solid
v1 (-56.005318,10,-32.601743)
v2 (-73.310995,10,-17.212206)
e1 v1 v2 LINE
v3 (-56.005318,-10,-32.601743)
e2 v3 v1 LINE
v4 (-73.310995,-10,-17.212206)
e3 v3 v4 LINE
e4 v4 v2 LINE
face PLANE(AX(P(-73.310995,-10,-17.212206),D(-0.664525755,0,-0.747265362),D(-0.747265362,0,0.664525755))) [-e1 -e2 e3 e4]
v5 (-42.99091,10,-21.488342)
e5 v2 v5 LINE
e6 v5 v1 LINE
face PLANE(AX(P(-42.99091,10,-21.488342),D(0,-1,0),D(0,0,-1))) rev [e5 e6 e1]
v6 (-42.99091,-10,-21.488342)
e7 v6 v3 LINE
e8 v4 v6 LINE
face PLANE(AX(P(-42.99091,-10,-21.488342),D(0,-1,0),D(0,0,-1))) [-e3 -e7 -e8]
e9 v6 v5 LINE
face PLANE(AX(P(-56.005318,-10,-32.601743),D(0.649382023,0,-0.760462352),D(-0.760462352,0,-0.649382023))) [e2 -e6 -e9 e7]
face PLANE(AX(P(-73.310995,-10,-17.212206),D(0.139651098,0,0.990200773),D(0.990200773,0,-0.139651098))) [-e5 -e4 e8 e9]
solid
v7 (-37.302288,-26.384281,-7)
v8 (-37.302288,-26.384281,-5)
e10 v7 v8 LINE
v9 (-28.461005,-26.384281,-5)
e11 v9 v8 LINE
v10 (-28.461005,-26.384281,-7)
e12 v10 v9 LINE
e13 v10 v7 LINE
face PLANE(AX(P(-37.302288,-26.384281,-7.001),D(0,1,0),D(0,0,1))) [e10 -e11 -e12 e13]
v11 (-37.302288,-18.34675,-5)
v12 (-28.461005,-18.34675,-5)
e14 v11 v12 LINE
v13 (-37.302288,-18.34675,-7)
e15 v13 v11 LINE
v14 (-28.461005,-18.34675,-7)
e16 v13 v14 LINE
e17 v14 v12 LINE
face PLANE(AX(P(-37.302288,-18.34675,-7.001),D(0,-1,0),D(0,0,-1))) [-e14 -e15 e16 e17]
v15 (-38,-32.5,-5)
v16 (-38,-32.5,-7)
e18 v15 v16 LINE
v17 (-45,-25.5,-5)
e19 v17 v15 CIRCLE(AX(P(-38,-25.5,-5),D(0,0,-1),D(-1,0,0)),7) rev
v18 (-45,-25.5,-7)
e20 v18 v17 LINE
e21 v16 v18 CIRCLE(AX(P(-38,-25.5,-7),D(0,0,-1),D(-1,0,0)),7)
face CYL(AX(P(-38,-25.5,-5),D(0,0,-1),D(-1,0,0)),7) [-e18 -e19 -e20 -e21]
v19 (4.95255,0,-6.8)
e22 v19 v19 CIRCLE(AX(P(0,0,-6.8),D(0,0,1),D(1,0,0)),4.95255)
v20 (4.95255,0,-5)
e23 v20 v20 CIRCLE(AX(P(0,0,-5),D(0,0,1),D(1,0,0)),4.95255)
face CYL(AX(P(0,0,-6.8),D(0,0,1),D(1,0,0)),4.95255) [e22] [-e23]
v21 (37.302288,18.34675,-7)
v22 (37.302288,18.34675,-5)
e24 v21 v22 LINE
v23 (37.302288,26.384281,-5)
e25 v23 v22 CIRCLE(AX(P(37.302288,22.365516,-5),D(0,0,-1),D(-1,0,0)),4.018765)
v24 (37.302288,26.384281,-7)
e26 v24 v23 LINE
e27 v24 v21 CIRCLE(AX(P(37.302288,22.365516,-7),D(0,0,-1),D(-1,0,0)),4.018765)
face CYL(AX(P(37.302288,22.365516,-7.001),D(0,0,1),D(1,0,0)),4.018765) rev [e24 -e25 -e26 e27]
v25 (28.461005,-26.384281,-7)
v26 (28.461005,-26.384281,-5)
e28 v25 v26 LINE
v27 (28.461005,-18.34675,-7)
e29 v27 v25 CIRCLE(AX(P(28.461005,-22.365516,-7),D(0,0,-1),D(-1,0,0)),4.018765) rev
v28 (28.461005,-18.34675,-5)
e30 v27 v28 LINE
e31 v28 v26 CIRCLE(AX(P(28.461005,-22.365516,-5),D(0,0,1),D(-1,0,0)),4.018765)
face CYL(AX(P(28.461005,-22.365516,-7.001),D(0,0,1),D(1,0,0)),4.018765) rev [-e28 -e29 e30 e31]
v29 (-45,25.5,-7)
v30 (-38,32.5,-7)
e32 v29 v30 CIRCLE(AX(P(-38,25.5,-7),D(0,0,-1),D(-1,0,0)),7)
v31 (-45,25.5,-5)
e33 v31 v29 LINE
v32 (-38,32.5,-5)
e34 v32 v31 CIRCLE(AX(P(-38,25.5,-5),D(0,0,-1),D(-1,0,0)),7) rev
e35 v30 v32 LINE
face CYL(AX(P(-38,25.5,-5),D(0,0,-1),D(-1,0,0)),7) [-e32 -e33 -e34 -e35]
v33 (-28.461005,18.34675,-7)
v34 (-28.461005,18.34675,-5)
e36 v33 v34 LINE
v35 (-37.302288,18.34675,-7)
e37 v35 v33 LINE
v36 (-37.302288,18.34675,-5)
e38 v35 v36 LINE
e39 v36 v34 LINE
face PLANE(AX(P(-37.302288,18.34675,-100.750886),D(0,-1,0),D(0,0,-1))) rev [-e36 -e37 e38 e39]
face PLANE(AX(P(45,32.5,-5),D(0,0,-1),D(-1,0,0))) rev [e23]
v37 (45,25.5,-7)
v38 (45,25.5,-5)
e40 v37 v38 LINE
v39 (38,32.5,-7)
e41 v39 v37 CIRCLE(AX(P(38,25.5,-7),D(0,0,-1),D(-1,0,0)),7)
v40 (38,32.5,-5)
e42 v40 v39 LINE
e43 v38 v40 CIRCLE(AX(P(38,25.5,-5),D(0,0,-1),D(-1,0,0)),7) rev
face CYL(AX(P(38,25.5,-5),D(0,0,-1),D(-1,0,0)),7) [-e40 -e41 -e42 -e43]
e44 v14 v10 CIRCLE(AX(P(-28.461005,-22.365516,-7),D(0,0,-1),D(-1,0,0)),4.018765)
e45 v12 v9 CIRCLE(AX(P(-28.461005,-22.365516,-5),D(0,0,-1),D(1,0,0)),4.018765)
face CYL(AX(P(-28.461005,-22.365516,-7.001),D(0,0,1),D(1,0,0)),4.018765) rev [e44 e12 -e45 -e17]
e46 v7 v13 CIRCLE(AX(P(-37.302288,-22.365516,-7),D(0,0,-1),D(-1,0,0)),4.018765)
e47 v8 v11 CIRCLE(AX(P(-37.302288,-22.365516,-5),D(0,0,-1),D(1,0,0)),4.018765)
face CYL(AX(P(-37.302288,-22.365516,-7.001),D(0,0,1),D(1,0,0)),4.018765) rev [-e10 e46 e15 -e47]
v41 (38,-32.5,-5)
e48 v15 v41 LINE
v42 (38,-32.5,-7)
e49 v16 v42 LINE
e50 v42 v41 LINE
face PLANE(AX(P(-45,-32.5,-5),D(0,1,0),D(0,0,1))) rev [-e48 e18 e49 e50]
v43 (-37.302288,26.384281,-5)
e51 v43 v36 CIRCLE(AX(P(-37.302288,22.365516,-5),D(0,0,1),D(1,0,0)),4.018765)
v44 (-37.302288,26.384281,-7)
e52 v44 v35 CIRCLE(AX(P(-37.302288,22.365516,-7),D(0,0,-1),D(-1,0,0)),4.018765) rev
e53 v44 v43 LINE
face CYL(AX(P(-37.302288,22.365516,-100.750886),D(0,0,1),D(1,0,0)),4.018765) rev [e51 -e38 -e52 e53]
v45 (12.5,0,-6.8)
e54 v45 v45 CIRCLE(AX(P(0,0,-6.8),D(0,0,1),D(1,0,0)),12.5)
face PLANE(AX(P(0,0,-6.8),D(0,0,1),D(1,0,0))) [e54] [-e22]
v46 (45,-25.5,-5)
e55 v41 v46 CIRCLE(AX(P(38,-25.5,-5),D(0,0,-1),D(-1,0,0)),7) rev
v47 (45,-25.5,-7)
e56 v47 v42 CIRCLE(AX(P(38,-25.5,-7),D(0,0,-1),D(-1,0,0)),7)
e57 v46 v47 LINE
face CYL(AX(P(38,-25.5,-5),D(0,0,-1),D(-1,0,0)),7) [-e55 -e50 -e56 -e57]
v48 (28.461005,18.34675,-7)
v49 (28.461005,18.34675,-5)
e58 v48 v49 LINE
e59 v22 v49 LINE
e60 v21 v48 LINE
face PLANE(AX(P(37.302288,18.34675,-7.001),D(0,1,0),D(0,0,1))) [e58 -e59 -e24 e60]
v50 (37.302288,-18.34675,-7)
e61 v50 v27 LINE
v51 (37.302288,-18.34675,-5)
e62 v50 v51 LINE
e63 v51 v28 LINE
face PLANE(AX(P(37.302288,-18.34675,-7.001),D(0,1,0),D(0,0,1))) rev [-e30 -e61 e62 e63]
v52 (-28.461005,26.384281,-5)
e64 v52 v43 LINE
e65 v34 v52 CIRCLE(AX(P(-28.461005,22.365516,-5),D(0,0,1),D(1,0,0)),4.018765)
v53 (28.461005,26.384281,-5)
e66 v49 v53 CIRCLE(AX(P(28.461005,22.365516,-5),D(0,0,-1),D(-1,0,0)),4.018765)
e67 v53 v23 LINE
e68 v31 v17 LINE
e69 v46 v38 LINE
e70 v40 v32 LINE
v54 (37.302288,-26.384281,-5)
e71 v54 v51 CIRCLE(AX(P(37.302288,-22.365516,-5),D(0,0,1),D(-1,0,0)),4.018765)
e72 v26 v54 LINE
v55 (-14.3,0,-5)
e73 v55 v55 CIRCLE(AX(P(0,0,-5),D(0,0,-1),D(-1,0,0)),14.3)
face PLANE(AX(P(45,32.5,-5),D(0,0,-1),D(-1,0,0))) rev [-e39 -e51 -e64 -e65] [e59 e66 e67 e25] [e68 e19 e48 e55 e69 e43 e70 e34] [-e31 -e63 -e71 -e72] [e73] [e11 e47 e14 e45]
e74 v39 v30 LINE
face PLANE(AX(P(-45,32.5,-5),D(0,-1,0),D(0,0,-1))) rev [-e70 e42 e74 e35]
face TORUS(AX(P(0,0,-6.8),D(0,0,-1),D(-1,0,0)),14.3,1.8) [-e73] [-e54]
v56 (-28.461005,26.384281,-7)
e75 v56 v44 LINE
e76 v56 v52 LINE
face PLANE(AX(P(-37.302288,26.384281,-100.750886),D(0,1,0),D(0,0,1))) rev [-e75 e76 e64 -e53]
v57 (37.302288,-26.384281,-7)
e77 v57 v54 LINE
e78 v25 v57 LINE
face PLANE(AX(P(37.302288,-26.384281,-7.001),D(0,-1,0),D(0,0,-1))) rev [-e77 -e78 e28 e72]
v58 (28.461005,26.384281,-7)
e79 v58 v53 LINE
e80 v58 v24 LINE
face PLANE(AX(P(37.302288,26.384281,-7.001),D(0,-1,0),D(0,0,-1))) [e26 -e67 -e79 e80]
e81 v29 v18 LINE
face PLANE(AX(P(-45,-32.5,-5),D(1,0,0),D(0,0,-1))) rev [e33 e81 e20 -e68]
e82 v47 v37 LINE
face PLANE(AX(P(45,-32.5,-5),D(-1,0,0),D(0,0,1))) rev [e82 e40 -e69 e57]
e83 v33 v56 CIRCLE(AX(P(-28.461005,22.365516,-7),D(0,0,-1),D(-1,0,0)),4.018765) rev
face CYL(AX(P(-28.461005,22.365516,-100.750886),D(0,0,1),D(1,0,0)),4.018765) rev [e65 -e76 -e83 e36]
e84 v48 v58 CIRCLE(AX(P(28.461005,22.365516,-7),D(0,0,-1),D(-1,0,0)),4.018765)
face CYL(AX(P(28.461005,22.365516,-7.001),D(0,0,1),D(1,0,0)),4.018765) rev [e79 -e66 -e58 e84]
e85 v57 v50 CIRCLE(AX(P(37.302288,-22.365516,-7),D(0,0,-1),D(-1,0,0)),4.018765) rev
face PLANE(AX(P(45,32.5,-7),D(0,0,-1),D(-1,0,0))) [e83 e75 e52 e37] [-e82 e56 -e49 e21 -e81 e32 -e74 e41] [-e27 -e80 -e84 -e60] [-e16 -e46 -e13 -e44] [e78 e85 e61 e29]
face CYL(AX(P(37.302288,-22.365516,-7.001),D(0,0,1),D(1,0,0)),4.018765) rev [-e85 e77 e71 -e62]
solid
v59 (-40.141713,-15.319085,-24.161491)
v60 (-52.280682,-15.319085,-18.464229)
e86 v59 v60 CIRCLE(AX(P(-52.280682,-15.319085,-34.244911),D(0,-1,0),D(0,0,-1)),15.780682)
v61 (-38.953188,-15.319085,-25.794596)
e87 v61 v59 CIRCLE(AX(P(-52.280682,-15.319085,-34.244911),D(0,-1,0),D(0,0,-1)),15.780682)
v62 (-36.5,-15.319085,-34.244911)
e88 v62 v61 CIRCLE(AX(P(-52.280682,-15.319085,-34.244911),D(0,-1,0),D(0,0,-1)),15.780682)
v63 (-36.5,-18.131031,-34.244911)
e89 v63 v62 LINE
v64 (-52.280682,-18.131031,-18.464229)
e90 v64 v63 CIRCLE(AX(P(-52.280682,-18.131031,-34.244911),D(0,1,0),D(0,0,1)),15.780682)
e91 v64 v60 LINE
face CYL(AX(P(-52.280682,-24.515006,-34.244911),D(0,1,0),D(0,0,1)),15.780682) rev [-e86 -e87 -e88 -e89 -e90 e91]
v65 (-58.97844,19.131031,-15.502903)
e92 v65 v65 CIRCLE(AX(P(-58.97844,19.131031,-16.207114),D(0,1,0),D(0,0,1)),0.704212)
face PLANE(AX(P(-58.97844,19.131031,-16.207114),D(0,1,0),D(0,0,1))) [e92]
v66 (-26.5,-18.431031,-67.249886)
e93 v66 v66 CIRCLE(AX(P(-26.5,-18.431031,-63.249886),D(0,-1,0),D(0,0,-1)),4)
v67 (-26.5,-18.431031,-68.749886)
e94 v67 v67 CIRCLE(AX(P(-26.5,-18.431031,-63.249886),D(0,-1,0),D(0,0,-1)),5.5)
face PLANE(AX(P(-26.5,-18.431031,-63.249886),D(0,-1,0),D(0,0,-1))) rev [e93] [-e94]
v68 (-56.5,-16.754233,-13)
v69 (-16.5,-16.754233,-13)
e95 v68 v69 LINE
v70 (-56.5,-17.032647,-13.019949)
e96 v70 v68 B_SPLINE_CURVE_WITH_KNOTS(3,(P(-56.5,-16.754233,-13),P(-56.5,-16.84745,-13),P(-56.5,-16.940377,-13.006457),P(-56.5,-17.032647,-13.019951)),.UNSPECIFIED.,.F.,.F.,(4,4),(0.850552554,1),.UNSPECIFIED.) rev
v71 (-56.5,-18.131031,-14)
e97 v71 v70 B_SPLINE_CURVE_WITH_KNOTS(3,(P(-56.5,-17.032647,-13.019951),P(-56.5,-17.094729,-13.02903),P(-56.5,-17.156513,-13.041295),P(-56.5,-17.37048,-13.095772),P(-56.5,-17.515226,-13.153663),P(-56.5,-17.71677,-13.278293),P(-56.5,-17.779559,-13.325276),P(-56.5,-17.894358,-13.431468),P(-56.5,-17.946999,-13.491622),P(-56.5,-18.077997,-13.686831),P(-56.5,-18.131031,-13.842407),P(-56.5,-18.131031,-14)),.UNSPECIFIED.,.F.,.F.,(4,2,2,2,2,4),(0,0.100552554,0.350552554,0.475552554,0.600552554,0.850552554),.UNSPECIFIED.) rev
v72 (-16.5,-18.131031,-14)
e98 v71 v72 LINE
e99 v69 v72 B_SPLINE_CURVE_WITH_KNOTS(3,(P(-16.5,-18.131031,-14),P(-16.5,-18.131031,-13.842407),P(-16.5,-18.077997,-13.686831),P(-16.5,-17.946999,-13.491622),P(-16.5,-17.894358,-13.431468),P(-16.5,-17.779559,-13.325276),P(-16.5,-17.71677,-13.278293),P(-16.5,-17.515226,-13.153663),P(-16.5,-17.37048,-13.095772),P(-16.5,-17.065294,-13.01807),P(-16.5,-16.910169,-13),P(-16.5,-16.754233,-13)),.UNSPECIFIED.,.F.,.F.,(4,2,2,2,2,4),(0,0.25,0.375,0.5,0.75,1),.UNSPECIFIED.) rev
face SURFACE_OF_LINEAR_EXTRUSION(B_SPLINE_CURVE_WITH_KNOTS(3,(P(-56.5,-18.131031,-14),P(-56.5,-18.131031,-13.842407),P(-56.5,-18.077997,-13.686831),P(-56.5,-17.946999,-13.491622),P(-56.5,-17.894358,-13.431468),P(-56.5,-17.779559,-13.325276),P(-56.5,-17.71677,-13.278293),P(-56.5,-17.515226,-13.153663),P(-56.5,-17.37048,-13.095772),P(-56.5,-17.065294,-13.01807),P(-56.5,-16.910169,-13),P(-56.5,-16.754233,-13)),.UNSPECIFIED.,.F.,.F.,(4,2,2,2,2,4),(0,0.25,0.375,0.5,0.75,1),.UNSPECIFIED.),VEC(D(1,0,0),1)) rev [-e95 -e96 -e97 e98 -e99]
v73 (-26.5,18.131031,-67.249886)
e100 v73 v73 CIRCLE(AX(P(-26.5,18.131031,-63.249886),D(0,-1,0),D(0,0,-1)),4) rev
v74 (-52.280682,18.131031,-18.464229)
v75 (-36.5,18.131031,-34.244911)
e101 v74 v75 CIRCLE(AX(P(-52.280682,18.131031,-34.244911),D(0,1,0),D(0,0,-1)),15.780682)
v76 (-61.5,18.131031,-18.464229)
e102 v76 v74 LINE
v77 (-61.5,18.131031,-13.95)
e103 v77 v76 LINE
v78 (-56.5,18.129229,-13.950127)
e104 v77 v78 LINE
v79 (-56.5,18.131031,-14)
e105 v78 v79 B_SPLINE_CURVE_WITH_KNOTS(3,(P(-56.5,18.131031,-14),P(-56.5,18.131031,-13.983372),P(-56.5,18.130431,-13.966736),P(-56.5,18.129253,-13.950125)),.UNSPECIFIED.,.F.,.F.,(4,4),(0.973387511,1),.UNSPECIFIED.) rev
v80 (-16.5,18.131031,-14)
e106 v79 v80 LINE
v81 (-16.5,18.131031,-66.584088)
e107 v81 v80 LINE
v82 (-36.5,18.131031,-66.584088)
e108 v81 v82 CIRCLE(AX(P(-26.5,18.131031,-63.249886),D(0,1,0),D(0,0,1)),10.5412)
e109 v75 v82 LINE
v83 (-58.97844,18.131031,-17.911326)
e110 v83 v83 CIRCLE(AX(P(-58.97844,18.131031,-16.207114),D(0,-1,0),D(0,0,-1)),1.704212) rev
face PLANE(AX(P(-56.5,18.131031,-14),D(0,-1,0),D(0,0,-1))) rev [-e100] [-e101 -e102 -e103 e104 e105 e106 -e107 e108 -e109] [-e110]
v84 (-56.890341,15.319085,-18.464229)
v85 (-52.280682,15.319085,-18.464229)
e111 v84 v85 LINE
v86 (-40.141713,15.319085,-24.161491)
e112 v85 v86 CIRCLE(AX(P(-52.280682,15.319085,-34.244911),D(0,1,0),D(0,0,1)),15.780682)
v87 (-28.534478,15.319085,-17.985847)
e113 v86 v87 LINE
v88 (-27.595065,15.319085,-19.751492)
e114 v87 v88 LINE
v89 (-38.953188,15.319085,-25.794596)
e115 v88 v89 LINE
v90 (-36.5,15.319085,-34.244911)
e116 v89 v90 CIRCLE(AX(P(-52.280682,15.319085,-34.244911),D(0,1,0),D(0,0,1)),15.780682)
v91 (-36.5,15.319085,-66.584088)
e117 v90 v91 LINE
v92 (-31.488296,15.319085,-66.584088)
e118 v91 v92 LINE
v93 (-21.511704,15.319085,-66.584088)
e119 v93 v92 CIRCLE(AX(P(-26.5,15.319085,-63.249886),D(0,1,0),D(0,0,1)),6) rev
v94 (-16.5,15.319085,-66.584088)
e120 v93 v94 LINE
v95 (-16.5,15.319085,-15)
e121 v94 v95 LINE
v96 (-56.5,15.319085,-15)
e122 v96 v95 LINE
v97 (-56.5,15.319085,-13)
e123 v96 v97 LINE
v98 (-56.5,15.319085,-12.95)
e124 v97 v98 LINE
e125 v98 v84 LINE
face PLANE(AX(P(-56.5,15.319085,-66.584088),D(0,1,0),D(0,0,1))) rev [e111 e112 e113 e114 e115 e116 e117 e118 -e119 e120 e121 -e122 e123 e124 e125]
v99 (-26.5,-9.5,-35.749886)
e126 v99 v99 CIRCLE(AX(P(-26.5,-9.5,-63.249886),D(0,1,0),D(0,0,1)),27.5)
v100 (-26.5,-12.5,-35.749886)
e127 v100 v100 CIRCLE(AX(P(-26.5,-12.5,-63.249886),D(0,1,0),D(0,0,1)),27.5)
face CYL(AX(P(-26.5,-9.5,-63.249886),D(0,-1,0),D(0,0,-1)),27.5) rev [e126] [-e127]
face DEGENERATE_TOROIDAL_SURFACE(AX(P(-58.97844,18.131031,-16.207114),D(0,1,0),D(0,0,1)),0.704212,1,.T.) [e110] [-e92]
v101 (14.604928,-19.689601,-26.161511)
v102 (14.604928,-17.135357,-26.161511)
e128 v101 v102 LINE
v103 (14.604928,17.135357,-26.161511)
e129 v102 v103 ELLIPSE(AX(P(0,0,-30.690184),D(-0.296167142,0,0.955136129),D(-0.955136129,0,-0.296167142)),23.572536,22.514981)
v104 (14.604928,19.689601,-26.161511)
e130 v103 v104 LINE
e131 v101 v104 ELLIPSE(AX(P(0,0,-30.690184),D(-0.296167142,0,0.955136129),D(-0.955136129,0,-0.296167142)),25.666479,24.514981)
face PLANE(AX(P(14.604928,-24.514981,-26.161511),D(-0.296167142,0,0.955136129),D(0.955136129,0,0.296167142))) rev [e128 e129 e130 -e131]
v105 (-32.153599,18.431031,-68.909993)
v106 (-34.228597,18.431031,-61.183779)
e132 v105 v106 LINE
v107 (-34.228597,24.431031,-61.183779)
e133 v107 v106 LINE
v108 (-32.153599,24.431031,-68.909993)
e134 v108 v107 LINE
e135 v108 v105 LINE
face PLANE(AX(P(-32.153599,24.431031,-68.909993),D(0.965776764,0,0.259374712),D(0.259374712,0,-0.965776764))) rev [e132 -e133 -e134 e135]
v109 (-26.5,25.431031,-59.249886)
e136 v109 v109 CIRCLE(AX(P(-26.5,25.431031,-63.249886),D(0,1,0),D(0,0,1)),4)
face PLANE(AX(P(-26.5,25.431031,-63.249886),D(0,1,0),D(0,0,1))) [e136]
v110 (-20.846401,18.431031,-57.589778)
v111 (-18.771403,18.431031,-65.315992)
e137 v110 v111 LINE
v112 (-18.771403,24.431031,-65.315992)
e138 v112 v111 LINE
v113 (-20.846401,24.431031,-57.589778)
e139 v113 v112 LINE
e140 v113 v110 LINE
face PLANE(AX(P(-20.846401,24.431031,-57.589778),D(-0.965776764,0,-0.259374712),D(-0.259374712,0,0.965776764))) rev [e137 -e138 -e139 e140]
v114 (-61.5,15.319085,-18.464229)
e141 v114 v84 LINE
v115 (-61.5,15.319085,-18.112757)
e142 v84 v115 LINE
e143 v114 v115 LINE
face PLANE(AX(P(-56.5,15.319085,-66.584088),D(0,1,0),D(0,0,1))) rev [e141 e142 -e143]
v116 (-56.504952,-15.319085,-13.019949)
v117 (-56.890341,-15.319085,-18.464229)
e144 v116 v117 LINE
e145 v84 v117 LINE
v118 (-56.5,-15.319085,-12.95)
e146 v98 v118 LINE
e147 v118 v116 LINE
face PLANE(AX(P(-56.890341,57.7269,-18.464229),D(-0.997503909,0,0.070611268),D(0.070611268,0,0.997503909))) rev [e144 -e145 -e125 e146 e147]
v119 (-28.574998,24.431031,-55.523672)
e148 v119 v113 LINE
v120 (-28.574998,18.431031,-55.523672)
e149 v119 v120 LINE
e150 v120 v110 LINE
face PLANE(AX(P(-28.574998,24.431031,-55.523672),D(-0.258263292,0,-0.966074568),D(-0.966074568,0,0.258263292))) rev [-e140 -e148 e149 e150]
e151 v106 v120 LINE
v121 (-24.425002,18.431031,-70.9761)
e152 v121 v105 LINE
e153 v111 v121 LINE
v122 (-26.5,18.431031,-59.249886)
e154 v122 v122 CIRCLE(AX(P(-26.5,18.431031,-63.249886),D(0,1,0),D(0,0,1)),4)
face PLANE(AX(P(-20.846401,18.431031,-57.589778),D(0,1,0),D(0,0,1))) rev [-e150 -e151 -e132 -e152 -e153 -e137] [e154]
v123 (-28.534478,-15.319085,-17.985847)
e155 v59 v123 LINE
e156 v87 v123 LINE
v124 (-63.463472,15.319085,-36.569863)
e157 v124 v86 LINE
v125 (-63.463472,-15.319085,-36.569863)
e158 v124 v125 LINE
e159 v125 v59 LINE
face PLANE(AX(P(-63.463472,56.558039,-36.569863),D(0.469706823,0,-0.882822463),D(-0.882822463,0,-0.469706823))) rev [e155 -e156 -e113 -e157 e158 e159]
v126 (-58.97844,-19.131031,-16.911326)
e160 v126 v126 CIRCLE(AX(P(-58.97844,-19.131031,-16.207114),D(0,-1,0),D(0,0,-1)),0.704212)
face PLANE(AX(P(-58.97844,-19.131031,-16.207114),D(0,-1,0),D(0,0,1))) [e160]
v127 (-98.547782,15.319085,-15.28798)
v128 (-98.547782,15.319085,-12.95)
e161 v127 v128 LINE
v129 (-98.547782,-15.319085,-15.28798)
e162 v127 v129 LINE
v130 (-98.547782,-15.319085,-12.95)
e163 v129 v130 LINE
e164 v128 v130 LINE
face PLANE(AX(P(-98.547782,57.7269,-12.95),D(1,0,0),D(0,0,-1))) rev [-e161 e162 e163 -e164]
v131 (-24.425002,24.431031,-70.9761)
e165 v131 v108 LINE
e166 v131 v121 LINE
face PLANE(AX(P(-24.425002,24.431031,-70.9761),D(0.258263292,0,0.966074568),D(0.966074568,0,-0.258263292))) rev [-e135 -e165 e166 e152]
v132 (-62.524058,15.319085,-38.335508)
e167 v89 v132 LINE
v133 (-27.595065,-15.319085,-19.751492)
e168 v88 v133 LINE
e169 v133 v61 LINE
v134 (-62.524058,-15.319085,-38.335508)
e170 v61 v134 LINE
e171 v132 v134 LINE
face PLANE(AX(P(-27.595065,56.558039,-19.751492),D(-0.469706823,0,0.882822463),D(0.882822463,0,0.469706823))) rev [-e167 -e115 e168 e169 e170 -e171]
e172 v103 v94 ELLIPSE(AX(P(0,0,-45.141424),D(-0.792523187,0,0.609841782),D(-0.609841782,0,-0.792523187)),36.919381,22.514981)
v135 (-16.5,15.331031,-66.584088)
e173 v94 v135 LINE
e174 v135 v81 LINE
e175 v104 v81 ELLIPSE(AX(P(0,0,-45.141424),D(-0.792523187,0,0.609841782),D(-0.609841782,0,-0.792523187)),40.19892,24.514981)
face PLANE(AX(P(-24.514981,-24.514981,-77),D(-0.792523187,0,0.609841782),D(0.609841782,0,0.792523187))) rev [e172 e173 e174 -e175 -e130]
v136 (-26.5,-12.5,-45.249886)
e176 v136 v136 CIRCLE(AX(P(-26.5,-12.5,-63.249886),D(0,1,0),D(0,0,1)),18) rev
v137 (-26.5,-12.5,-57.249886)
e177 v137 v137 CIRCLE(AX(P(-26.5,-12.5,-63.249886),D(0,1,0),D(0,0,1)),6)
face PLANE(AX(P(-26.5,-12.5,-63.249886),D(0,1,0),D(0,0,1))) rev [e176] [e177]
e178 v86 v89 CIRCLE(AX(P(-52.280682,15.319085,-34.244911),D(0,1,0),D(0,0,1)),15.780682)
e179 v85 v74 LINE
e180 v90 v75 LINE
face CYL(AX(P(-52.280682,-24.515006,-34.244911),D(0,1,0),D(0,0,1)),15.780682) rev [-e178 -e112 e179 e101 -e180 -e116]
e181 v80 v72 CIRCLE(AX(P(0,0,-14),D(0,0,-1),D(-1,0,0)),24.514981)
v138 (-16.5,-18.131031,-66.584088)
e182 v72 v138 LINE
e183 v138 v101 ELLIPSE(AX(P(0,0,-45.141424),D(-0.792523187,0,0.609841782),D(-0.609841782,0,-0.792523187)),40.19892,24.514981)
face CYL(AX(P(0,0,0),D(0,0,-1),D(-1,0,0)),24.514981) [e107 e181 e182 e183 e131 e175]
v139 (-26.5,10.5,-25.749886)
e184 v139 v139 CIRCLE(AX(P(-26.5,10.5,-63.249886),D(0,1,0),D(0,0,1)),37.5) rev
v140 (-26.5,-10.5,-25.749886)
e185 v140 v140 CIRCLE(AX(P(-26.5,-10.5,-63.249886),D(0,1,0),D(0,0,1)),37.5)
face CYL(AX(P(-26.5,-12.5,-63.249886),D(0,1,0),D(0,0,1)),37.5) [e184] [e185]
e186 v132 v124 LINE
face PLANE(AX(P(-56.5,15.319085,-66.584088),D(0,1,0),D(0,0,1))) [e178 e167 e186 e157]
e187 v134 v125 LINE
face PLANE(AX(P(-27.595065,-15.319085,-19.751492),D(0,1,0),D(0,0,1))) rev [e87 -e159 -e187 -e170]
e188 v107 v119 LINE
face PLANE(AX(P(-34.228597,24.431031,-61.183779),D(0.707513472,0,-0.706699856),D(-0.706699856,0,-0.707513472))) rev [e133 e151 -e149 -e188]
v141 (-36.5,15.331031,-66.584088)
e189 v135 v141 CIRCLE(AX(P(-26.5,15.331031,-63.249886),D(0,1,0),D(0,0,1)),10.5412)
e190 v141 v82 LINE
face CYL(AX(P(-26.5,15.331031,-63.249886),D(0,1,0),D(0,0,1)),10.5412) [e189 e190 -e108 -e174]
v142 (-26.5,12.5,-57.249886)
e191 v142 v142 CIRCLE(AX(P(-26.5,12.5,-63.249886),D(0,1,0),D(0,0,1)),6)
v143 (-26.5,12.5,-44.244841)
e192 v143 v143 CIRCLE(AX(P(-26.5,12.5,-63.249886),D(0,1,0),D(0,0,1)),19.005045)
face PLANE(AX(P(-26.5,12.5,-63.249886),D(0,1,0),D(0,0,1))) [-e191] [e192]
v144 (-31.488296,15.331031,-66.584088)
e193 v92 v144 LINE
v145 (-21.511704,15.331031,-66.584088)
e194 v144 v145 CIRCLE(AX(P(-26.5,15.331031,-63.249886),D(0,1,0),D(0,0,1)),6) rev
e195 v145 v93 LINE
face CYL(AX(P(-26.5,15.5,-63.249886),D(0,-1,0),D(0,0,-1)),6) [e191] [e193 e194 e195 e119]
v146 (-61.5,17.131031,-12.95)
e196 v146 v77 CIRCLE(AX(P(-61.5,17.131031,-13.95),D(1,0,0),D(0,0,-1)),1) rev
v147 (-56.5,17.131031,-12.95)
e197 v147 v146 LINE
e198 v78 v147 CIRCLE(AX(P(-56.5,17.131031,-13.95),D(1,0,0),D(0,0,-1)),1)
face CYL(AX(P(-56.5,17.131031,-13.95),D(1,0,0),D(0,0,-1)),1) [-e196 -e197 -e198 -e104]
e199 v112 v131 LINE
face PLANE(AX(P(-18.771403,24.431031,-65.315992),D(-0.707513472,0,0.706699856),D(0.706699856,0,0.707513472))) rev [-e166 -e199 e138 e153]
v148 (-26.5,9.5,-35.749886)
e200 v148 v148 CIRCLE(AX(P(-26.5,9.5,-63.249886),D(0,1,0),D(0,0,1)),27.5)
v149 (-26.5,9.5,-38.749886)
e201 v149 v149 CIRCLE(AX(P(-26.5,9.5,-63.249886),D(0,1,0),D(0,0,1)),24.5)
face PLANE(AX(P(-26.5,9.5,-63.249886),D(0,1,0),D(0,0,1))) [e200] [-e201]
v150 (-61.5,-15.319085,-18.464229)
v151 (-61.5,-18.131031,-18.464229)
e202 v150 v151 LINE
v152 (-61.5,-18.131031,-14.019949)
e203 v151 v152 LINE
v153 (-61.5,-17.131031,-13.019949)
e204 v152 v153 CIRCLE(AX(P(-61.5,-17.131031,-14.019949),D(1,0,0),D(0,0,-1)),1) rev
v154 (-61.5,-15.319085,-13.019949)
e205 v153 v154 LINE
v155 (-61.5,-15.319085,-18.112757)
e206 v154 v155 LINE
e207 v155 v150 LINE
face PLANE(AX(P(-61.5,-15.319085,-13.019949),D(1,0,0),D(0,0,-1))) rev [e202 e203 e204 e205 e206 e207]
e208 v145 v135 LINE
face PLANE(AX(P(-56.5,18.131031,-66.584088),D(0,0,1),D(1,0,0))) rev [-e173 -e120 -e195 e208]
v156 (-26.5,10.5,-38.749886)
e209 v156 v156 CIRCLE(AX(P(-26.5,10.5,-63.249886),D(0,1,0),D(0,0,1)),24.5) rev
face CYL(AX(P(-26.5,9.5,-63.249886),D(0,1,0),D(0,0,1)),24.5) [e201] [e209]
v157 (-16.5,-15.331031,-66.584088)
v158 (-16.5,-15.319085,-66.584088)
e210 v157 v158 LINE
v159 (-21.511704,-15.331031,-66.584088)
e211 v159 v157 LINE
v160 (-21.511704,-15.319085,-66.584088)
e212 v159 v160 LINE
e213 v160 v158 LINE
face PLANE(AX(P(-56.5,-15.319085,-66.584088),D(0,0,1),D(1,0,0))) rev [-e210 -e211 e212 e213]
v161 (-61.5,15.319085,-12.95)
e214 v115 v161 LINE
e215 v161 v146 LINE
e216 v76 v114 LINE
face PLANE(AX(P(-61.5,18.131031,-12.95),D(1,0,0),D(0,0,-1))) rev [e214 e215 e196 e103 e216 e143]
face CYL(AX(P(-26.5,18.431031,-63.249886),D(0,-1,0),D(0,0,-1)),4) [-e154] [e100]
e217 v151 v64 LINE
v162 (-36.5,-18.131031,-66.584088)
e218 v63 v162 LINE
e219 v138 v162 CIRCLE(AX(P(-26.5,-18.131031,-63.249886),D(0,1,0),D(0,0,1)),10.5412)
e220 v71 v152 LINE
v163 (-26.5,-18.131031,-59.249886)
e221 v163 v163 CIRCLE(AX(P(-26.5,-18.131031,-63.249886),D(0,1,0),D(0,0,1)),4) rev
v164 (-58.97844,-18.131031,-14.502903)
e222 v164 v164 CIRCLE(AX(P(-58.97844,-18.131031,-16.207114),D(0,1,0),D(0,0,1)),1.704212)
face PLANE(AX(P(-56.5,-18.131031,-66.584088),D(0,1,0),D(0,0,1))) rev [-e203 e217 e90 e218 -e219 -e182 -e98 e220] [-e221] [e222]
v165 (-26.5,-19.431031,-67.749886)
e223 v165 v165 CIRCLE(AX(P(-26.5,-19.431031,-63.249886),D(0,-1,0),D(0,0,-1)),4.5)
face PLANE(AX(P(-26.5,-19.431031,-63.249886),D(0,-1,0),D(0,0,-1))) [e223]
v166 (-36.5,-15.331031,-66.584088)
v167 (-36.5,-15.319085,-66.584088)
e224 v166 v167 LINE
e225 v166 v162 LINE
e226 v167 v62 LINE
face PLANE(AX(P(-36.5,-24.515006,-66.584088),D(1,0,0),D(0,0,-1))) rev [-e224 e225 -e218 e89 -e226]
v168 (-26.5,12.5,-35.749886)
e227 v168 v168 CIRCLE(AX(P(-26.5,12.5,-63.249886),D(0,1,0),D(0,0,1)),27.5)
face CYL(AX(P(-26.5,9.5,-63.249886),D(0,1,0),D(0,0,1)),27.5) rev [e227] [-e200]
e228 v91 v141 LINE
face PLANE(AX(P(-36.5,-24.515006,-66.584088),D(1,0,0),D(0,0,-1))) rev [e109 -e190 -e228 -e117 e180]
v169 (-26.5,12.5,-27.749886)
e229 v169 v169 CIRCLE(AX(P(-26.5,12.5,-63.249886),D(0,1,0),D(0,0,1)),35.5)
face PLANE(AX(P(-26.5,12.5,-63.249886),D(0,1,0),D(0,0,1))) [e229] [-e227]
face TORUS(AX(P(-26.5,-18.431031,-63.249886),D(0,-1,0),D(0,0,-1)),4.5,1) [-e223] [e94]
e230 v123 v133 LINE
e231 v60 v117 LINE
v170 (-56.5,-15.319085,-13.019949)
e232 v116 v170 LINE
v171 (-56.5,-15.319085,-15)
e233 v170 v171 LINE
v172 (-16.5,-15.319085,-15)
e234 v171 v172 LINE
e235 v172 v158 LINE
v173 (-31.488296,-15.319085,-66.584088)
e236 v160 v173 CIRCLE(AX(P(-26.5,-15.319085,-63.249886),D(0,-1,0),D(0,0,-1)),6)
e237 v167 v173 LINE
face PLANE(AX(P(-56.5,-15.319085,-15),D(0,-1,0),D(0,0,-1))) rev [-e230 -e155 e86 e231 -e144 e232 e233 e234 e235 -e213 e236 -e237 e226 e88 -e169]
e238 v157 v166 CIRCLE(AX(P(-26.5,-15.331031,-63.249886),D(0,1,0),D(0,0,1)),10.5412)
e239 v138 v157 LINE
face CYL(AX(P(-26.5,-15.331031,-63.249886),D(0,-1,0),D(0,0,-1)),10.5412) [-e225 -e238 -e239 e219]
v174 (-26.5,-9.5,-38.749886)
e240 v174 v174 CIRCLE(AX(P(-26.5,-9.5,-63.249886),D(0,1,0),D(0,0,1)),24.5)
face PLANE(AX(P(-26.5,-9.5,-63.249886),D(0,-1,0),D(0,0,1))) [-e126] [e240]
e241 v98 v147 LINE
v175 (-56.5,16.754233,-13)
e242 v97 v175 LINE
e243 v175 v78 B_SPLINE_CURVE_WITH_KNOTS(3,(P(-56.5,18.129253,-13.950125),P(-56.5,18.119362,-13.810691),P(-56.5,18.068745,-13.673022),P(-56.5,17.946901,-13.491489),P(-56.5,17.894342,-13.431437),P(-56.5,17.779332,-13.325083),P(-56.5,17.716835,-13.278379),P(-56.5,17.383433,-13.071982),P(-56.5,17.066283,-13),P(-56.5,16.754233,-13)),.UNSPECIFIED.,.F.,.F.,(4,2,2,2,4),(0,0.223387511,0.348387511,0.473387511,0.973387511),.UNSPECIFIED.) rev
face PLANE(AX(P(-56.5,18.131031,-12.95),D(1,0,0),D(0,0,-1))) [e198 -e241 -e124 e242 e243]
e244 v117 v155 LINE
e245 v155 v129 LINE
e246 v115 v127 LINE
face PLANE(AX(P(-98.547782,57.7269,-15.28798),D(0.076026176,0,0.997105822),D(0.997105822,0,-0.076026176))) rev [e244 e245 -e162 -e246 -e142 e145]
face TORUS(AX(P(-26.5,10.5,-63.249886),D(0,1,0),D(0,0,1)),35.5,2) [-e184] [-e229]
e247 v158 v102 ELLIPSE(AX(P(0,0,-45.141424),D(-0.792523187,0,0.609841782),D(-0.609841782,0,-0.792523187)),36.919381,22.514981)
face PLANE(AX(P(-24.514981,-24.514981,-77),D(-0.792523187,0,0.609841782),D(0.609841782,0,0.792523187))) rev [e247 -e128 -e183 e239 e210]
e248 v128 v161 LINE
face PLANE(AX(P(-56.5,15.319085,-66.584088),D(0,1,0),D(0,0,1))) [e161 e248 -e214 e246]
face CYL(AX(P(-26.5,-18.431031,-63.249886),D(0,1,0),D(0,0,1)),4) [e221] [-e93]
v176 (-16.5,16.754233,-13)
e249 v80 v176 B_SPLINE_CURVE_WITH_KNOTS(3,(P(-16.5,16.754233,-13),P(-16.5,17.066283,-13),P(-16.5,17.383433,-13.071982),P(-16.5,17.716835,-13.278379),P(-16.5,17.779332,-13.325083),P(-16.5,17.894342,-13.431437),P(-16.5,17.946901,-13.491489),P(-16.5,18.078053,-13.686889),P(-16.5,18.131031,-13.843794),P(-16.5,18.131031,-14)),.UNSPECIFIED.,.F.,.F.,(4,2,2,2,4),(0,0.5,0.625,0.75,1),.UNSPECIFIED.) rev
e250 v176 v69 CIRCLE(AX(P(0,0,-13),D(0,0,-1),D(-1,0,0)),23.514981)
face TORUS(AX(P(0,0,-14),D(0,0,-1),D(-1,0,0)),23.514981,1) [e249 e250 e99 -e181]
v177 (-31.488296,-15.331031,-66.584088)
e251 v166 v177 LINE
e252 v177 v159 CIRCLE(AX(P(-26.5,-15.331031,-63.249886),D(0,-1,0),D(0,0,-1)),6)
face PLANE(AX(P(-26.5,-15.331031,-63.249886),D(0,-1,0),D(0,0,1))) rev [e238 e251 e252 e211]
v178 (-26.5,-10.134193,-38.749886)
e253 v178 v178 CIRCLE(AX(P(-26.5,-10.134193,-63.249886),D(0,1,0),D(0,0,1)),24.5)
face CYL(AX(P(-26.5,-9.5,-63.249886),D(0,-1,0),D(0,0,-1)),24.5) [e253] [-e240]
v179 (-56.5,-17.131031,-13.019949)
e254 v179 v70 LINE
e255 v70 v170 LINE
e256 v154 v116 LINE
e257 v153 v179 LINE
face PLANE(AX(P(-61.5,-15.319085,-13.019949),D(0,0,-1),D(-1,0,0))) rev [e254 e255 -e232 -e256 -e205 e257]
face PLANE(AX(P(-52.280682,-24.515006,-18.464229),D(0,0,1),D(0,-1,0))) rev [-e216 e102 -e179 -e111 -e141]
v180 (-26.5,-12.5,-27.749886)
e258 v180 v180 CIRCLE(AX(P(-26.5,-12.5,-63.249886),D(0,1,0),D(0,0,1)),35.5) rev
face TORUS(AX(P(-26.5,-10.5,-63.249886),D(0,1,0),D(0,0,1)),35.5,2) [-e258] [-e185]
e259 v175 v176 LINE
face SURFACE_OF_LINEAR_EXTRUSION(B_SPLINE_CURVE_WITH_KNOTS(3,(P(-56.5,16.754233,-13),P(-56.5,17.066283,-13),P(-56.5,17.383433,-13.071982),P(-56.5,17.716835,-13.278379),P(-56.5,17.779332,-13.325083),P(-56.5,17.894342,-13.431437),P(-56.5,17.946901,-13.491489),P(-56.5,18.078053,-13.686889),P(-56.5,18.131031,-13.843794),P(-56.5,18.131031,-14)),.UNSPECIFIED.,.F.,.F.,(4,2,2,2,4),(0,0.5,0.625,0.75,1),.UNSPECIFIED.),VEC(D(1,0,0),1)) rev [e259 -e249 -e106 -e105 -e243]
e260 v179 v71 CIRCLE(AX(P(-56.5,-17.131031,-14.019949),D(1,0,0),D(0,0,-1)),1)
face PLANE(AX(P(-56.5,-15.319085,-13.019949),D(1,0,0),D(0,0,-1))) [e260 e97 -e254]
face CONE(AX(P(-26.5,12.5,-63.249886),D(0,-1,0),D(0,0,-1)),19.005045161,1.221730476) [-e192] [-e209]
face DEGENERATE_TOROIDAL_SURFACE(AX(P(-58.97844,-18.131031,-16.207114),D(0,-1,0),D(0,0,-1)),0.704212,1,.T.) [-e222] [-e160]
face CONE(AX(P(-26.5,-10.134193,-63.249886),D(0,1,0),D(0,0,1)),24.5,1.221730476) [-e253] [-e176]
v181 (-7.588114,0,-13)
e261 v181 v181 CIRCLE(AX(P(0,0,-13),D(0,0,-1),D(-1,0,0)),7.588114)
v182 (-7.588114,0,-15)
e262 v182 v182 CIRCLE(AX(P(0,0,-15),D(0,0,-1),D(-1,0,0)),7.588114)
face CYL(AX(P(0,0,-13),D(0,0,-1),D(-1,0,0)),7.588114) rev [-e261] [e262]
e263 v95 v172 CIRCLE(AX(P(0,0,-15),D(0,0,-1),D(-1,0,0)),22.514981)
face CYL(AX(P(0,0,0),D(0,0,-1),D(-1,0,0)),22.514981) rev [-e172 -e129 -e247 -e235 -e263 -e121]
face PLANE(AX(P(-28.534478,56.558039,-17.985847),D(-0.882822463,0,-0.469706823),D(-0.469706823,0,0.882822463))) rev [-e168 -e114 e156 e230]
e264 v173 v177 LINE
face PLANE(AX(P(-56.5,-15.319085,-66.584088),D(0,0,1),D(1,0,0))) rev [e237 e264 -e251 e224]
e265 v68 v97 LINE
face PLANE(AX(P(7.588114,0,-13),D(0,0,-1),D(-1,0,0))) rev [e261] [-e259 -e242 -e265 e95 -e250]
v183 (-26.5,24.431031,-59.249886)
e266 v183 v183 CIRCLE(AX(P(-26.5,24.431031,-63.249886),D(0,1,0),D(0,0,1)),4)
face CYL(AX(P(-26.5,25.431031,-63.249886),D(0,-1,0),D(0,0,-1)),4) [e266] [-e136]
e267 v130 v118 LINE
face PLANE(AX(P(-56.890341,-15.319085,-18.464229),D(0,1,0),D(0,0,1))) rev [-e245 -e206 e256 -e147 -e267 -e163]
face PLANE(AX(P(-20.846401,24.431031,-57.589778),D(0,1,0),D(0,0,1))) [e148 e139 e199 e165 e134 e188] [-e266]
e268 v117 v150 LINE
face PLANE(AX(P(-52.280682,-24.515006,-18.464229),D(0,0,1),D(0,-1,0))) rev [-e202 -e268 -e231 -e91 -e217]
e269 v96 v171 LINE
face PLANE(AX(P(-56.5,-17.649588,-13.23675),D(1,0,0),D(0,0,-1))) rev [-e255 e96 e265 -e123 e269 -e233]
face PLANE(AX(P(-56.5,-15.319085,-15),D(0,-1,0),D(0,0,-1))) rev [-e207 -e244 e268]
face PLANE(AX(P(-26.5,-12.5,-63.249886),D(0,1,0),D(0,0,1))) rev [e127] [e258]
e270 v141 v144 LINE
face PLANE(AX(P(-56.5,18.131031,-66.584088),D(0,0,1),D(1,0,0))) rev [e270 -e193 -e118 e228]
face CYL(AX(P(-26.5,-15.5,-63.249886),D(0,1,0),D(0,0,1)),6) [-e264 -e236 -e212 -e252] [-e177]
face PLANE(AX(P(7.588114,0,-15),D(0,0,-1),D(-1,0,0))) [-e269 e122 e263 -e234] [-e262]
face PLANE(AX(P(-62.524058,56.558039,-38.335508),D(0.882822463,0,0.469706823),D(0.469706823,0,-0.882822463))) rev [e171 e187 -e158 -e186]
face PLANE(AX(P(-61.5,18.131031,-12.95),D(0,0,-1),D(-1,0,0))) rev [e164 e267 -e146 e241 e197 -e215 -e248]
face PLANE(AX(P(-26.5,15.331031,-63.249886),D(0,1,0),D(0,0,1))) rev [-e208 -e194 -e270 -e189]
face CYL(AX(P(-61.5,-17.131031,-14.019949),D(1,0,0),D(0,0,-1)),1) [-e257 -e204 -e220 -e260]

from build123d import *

# Parameters (mm, degrees)
CUT_EXTRUDE_2_DEPTH      = 85.445062578
CUT_EXTRUDE_2_DEPTH_BACK = 85.445062578
CUT_EXTRUDE_3_DEPTH      = 85.445062578
CUT_EXTRUDE_3_DEPTH_BACK = 85.445062578
EXTRUDE_6_DEPTH          = 40
EXTRUDE_7_DEPTH          = 2.8
CUT_EXTRUDE_4_DEPTH      = 103.254861861
SKETCH_18_R              = 4
EXTRUDE_8_DEPTH          = 0.3
EXTRUDE_9_DEPTH          = 6
SKETCH_20_R              = 4
EXTRUDE_10_DEPTH         = 1
EXTRUDE_START            = 0.3
SKETCH_21_R              = 4
EXTRUDE_11_DEPTH         = 0.3
SKETCH_22_R              = 5.5
EXTRUDE_12_DEPTH         = 1
FILLET_1_R               = 1
EXTRUDE_13_DEPTH         = 12.5
EXTRUDE_13_DEPTH_BACK    = 12.5
SKETCH_23_R              = 37.5
FILLET_2_R               = 2
SKETCH_24_R              = 27.5
SKETCH_24_R_2            = 24.5
CUT_EXTRUDE_5_DEPTH      = 3
CHAMFER_1_SIZE           = 2
CHAMFER_1_SIZE2          = 5.494954839
CHAMFER_2_SIZE           = 6.5
CHAMFER_2_SIZE2          = 2.365806523
SKETCH_25_R              = 6
EXTRUDE_14_DEPTH         = 3
SKETCH_28_W              = 5.514229373
SKETCH_28_H              = 2.811946084
SKETCH_28_W_2            = 5.444280039
EXTRUDE_15_DEPTH         = 5
FILLET_3_R               = 1
EXTRUDE_16_DEPTH         = 30.638170479
SKETCH_30_R              = 1.704211516
EXTRUDE_17_DEPTH         = 1
FILLET_4_R               = 1
FILLET_4_OF_MIRROR_7_R   = 1
EXTRUDE_18_DEPTH         = 30.638170479
EXTRUDE_21_DEPTH         = 10
EXTRUDE_21_DEPTH_BACK    = 10
SKETCH_33_W              = 90
SKETCH_33_H              = 65
EXTRUDE_22_DEPTH         = 2
FILLET_5_R               = 7
CUT_EXTRUDE_6_DEPTH      = 2
MIRROR_9_COPY_1_DEPTH    = 2
SKETCH_35_R              = 12.5
SKETCH_35_R_2            = 4.952549827
CUT_EXTRUDE_8_DEPTH      = 1.8
FILLET_6_R               = 1.8


# Read off the part's stored shape, not the designer's step: 加厚3
# Some blends are built 0.0001 mm under size
with BuildPart() as part:
    # 加厚3 outline → 加厚3 (revolve)
    with BuildSketch(Plane.XZ):
        with BuildLine():
            Line((22.51498107, -15), (22.51498107, -77))
            Line((22.51498107, -77), (24.51498107, -77))
            Line((24.51498107, -77), (24.51498107, -14))
            ThreePointArc((24.51498107, -14), (24.222087851, -13.292893219), (23.51498107, -13))
            Line((23.51498107, -13), (7.588114325, -13))
            Line((7.588114325, -13), (7.588114325, -15))
            Line((7.588114325, -15), (22.51498107, -15))
        make_face()
    revolve(axis=Axis((0, 0, 0), (0, 0, 1)))

    # 草图13 → 切除-拉伸2 (cut, two sides: drawn at the far end of the back side and taken through both)
    with BuildSketch(Plane(origin=(0, 0, 0), x_dir=(1, 0, 0), z_dir=(0, 1, 0)).offset(-CUT_EXTRUDE_2_DEPTH_BACK)):
        Polygon((-24.51498107, 77), (14.604928022, 26.16151052), (24.51498107, 23.088616514), (24.51498107, 77), align=None)
    extrude(amount=CUT_EXTRUDE_2_DEPTH + CUT_EXTRUDE_2_DEPTH_BACK, mode=Mode.SUBTRACT)

    # 草图14 → 切除-拉伸3 (cut, two sides: drawn at the far end of the back side and taken through both)
    with BuildSketch(Plane(origin=(0, 0, 0), x_dir=(1, 0, 0), z_dir=(0, 1, 0)).offset(-CUT_EXTRUDE_3_DEPTH_BACK)):
        Polygon((-16.5, 70.472511213), (-16.5, 12.57524565), (-25.363625659, 12.57524565), (-25.363625659, 79.702348144), align=None)
    extrude(amount=CUT_EXTRUDE_3_DEPTH + CUT_EXTRUDE_3_DEPTH_BACK, mode=Mode.SUBTRACT)

    # 草图15 → 凸台-拉伸6 (add)
    with BuildSketch(Plane.ZY.offset(16.5)):
        with BuildLine():
            Line((-13, -16.754233337), (-13, 16.754233337))
            add(Edge.make_bspline(
                [(-13, 16.754233337), (-13, 17.066282989), (-13.071981627, 17.383432621), (-13.278379206, 17.716834739), (-13.32508278, 17.779332115), (-13.431437184, 17.894341909), (-13.491489359, 17.946901419), (-13.686888914, 18.078052515), (-13.843794025, 18.131031324), (-14, 18.131031324)],
                knots=[0, 0, 0, 0, 0.5, 0.5, 0.625, 0.625, 0.75, 0.75, 1, 1, 1, 1], degree=3))
            Line((-14, 18.131031324), (-66.584087994, 18.131031324))
            Line((-66.584087994, 18.131031324), (-66.584087994, 15.31908524))
            Line((-66.584087994, 15.31908524), (-15, 15.31908524))
            Line((-15, 15.31908524), (-15, -15.31908524))
            Line((-15, -15.31908524), (-66.584087994, -15.31908524))
            Line((-66.584087994, -15.31908524), (-66.584087994, -18.131031324))
            Line((-66.584087994, -18.131031324), (-14, -18.131031324))
            add(Edge.make_bspline(
                [(-14, -18.131031324), (-13.842407053, -18.131031324), (-13.686831177, -18.07799673), (-13.491621762, -17.946998796), (-13.431468043, -17.894358188), (-13.325276406, -17.779558555), (-13.278292746, -17.716769524), (-13.153663134, -17.515226129), (-13.095772202, -17.370480096), (-13.018069892, -17.065294363), (-13, -16.910169012), (-13, -16.754233337)],
                knots=[0, 0, 0, 0, 0.25, 0.25, 0.375, 0.375, 0.5, 0.5, 0.75, 0.75, 1, 1, 1, 1], degree=3))
        make_face()
    extrude(amount=EXTRUDE_6_DEPTH)

    # 草图16 → 凸台-拉伸7 (add)
    with BuildSketch(Plane(origin=(0, 18.131031324, 0), x_dir=(1, 0, 0), z_dir=(0, 1, 0))):
        with BuildLine():
            Line((-16.5, 66.584087994), (-36.5, 66.584087994))
            ThreePointArc((-36.5, 66.584087994), (-26.5, 73.791086056), (-16.5, 66.584087994))
        make_face()
    extrude_7 = extrude(amount=-EXTRUDE_7_DEPTH)

    # 镜向1: 凸台-拉伸7 across plane
    add(extrude_7.mirror(Plane.ZX))

    # 草图17 → 切除-拉伸4 (cut, through all)
    with BuildSketch(Plane(origin=(0, 18.131031324, 0), x_dir=(1, 0, 0), z_dir=(0, 1, 0))):
        with BuildLine():
            Line((-36.5, 66.584087994), (-36.5, 34.244911042))
            ThreePointArc((-36.5, 34.244911042), (-41.122054778, 23.08628371), (-52.28068211, 18.464228931))
            Line((-52.28068211, 18.464228931), (-56.5, 18.464228931))
            Line((-56.5, 18.464228931), (-56.5, 66.584087994))
            Line((-56.5, 66.584087994), (-36.5, 66.584087994))
        make_face()
    extrude(amount=-CUT_EXTRUDE_4_DEPTH, mode=Mode.SUBTRACT)

    # 草图18 → 凸台-拉伸8 (add)
    with BuildSketch(Plane(origin=(0, 18.131031324, 0), x_dir=(1, 0, 0), z_dir=(0, 1, 0))):
        with Locations(Location((-26.5, 63.249885701, 0), (0, 0, 90))):
            Circle(SKETCH_18_R)
    extrude(amount=EXTRUDE_8_DEPTH)

    # 草图19 → 凸台-拉伸9 (add)
    with BuildSketch(Plane(origin=(0, 18.431031324, 0), x_dir=(1, 0, 0), z_dir=(0, 1, 0))):
        Polygon((-20.84640115, 57.589777924), (-18.771403452, 65.31599204), (-24.425002303, 70.976099816), (-32.15359885, 68.909993477), (-34.228596548, 61.183779361), (-28.574997697, 55.523671585), align=None)
    extrude(amount=EXTRUDE_9_DEPTH)

    # 草图20 → 凸台-拉伸10 (add)
    with BuildSketch(Plane(origin=(0, 24.431031324, 0), x_dir=(1, 0, 0), z_dir=(0, 1, 0))):
        with Locations(Location((-26.5, 63.249885701, 0), (0, 0, 90))):
            Circle(SKETCH_20_R)
    extrude(amount=EXTRUDE_10_DEPTH)

    # 草图21 → 凸台-拉伸11 (add)
    with BuildSketch(Plane.XZ.offset(18.131031324).offset(EXTRUDE_START)):
        with Locations(Location((-26.5, -63.249885701, 0), (0, 0, 270))):
            Circle(SKETCH_21_R)
    extrude(amount=-EXTRUDE_11_DEPTH)

    # 草图22 → 凸台-拉伸12 (add)
    with BuildSketch(Plane.XZ.offset(18.431031324)):
        with Locations(Location((-26.5, -63.249885701, 0), (0, 0, 270))):
            Circle(SKETCH_22_R)
    extrude(amount=EXTRUDE_12_DEPTH)

    # 圆角1
    fillet_1_edges = [part.edges().sort_by_distance(p)[0] for p in [
        (-26.5, -19.431031324, -57.749885701),
    ]]
    fillet(fillet_1_edges, radius=FILLET_1_R - 0.0001)  # a hair under: the kernel refuses the full size



with BuildPart() as body_2:
    # 草图23 → 凸台-拉伸13 (new, two sides: drawn at the far end of the back side and taken through both)
    with BuildSketch(Plane(origin=(0, 0, 0), x_dir=(1, 0, 0), z_dir=(0, 1, 0)).offset(-EXTRUDE_13_DEPTH_BACK)):
        with Locations(Location((-26.5, 63.249885701, 0), (0, 0, 270))):
            Circle(SKETCH_23_R)
    extrude(amount=EXTRUDE_13_DEPTH + EXTRUDE_13_DEPTH_BACK)

    # 圆角2
    fillet_2_edges = [body_2.edges().sort_by_distance(p)[0] for p in [
        (-26.5, -12.5, -100.749885701),
        (-26.5, 12.5, -100.749885701),
    ]]
    fillet(fillet_2_edges, radius=FILLET_2_R)

    # 草图24 → 切除-拉伸5 (cut)
    with BuildSketch(Plane(origin=(0, 12.5, 0), x_dir=(1, 0, 0), z_dir=(0, 1, 0))):
        with Locations(Location((-26.5, 63.249885701, 0), (0, 0, 270))):
            Circle(SKETCH_24_R)
        with Locations(Location((-26.5, 63.249885701, 0), (0, 0, 270))):
            Circle(SKETCH_24_R_2, mode=Mode.SUBTRACT)
    cut_extrude_5 = extrude(amount=-CUT_EXTRUDE_5_DEPTH, mode=Mode.SUBTRACT)

    # 镜向2: 切除-拉伸5 across plane
    add(cut_extrude_5.mirror(Plane.ZX), mode=Mode.SUBTRACT)

    # 倒角1
    chamfer_1_edges = [body_2.edges().sort_by_distance(p)[0] for p in [
        (-26.5, 12.5, -87.749885701),
    ]]
    chamfer_1_side = [body_2.faces().sort_by_distance(p)[0] for p in [
        (-26.5, 11, -87.749885701),
    ]]
    chamfer(chamfer_1_edges, length=CHAMFER_1_SIZE, length2=CHAMFER_1_SIZE2, reference=chamfer_1_side[0])

    # 倒角2
    chamfer_2_edges = [body_2.edges().sort_by_distance(p)[0] for p in [
        (-26.5, -12.5, -87.749885701),
    ]]
    chamfer_2_side = [body_2.faces().sort_by_distance(p)[0] for p in [
        (-26.5, -12.5, -63.249885701),
    ]]
    chamfer(chamfer_2_edges, length=CHAMFER_2_SIZE, length2=CHAMFER_2_SIZE2, reference=chamfer_2_side[0])


with BuildPart() as part_1:
    add(part.part)

    add(body_2.part)  # 凸台-拉伸14 merges body 2
    # 草图25 → 凸台-拉伸14 (add)
    with BuildSketch(Plane(origin=(0, 12.5, 0), x_dir=(1, 0, 0), z_dir=(0, 1, 0))):
        with Locations(Location((-26.5, 63.249885701, 0), (0, 0, 33.758968922))):
            Circle(SKETCH_25_R)
    extrude_14 = extrude(amount=EXTRUDE_14_DEPTH)

    # 镜向5: 凸台-拉伸14 across plane
    add(extrude_14.mirror(Plane.ZX))

    # 草图28 → 凸台-拉伸15 (add)
    with BuildSketch(Plane.ZY.offset(56.5)):
        with Locations((-15.707114245, 16.725058282)):
            Rectangle(SKETCH_28_W, SKETCH_28_H)
        with Locations((-15.742088912, -16.725058282)):
            Rectangle(SKETCH_28_W_2, SKETCH_28_H)
    extrude(amount=EXTRUDE_15_DEPTH)

    # 圆角3
    # the kernel refuses this fillet: 1 mm, written as the material it takes off along each edge
    with BuildSketch(Plane(origin=(-54, -18.131031324, -13.019948892), x_dir=(0, 1, 0), z_dir=(-1, 0, 0))) as fillet_3_piece_1:
        with BuildLine():
            CenterArc((FILLET_3_R, FILLET_3_R), FILLET_3_R, 180, 90)
            Line((0, FILLET_3_R), (0, 0))
            Line((0, 0), (FILLET_3_R, 0))
        make_face()
    extrude(amount=10, mode=Mode.SUBTRACT)
    with BuildSketch(Plane(origin=(-54, 18.131031324, -12.949999558), x_dir=(0, -1, 0), z_dir=(-1, 0, 0))) as fillet_3_piece_2:
        with BuildLine():
            CenterArc((FILLET_3_R, -FILLET_3_R), FILLET_3_R, 90, 90)
            Line((0, -FILLET_3_R), (0, 0))
            Line((0, 0), (FILLET_3_R, 0))
        make_face()
    extrude(amount=10, mode=Mode.SUBTRACT)

    # 草图29 → 凸台-拉伸16 (add)
    with BuildSketch(Plane(origin=(0, -15.31908524, 0), x_dir=(1, 0, 0), z_dir=(0, 1, 0))):
        Polygon((-56.5, 12.949999558), (-98.547782496, 12.949999558), (-98.547782496, 15.287980311), (-56.890341055, 18.464228931), align=None)
    extrude(amount=EXTRUDE_16_DEPTH)

    # 草图30 → 凸台-拉伸17 (add)
    with BuildSketch(Plane(origin=(0, 18.131031324, 0), x_dir=(1, 0, 0), z_dir=(0, 1, 0))):
        with Locations(Location((-58.978440112, 16.207114245, 0), (0, 0, 90))):
            Circle(SKETCH_30_R)
    extrude_17 = extrude(amount=EXTRUDE_17_DEPTH)

    # 圆角4
    fillet_4_edges = [part_1.edges().sort_by_distance(p)[0] for p in [
        (-58.978440112, 19.131031324, -14.502902728),
    ]]
    fillet(fillet_4_edges, radius=FILLET_4_R - 0.0001)  # a hair under: the kernel refuses the full size

    # 镜向7: 凸台-拉伸17 across plane
    add(extrude_17.mirror(Plane.ZX))

    # 圆角4 of 镜向7
    fillet_4_of_mirror_7_edges = [part_1.edges().sort_by_distance(p)[0] for p in [
        (-58.978440112, -19.131031324, -14.502902728),
    ]]
    fillet(fillet_4_of_mirror_7_edges, radius=FILLET_4_OF_MIRROR_7_R - 0.0001)  # a hair under: the kernel refuses the full size

    # 草图31 → 凸台-拉伸18 (add)
    with BuildSketch(Plane(origin=(0, -15.31908524, 0), x_dir=(1, 0, 0), z_dir=(0, 1, 0))):
        Polygon((-27.595064563, 19.751491867), (-62.524058105, 38.335507661), (-63.463471751, 36.569862736), (-28.53447821, 17.985846941), align=None)
    extrude(amount=EXTRUDE_18_DEPTH)


with BuildPart() as body_2_2:
    # 草图32 → 凸台-拉伸21 (new, two sides: drawn at the far end of the back side and taken through both)
    with BuildSketch(Plane(origin=(0, 0, 0), x_dir=(1, 0, 0), z_dir=(0, 1, 0)).offset(-EXTRUDE_21_DEPTH_BACK)):
        Polygon((-73.310994796, 17.212205836), (-56.005318264, 32.601742611), (-42.990909795, 21.488341825), align=None)
    extrude(amount=EXTRUDE_21_DEPTH + EXTRUDE_21_DEPTH_BACK)


with BuildPart() as body_3:
    # 草图33 → 凸台-拉伸22 (new body)
    with BuildSketch(Plane.XY.offset(-7)):
        Rectangle(SKETCH_33_W, SKETCH_33_H)
    extrude(amount=EXTRUDE_22_DEPTH)

    # 圆角5
    fillet_5_edges = [body_3.edges().sort_by_distance(p)[0] for p in [
        (45, -32.5, -6),
        (-45, -32.5, -6),
        (-45, 32.5, -6),
        (45, 32.5, -6),
    ]]
    fillet(fillet_5_edges, radius=FILLET_5_R)

    # 草图34 → 切除-拉伸6 (cut)
    with BuildSketch(Plane.XY.offset(-5)):
        with BuildLine():
            Line((-37.302288021, 26.384280733), (-28.461004649, 26.384280733))
            ThreePointArc((-28.461004649, 26.384280733), (-24.44223948, 22.365515564), (-28.461004649, 18.346750395))
            Line((-28.461004649, 18.346750395), (-37.302288021, 18.346750395))
            ThreePointArc((-37.302288021, 18.346750395), (-41.32105319, 22.365515564), (-37.302288021, 26.384280733))
        make_face()
    cut_extrude_6 = extrude(amount=-CUT_EXTRUDE_6_DEPTH, mode=Mode.SUBTRACT)

    # 镜向8: 切除-拉伸6 across plane
    add(cut_extrude_6.mirror(Plane.ZX), mode=Mode.SUBTRACT)

    # 镜向9: 切除-拉伸6 across plane
    add(cut_extrude_6.mirror(Plane(origin=(0, 0, 0), x_dir=(0, 0, 1), z_dir=(1, 0, 0))), mode=Mode.SUBTRACT)

    # 镜向9 copy 1 sketch → 镜向9 copy 1 (cut)
    with BuildSketch(Plane(origin=(0, 0, -5), x_dir=(-1, 0, 0), z_dir=(0, 0, 1))):
        with BuildLine():
            Line((-37.302288021, 26.384280733), (-28.461004649, 26.384280733))
            ThreePointArc((-28.461004649, 26.384280733), (-24.44223948, 22.365515564), (-28.461004649, 18.346750395))
            Line((-28.461004649, 18.346750395), (-37.302288021, 18.346750395))
            ThreePointArc((-37.302288021, 18.346750395), (-41.32105319, 22.365515564), (-37.302288021, 26.384280733))
        make_face()
    extrude(amount=-MIRROR_9_COPY_1_DEPTH, mode=Mode.SUBTRACT)

    # 草图35 → 切除-拉伸8 (cut)
    with BuildSketch(Plane.XY.offset(-5)):
        Circle(SKETCH_35_R)
        Circle(SKETCH_35_R_2, mode=Mode.SUBTRACT)
    extrude(amount=-CUT_EXTRUDE_8_DEPTH, mode=Mode.SUBTRACT)

    # 圆角6
    fillet_6_edges = [body_3.edges().sort_by_distance(p)[0] for p in [
        (-12.5, 0, -5),
    ]]
    fillet(fillet_6_edges, radius=FILLET_6_R - 0.0001)  # a hair under: the kernel refuses the full size


solid = Compound([part_1.part, body_2_2.part, body_3.part])
